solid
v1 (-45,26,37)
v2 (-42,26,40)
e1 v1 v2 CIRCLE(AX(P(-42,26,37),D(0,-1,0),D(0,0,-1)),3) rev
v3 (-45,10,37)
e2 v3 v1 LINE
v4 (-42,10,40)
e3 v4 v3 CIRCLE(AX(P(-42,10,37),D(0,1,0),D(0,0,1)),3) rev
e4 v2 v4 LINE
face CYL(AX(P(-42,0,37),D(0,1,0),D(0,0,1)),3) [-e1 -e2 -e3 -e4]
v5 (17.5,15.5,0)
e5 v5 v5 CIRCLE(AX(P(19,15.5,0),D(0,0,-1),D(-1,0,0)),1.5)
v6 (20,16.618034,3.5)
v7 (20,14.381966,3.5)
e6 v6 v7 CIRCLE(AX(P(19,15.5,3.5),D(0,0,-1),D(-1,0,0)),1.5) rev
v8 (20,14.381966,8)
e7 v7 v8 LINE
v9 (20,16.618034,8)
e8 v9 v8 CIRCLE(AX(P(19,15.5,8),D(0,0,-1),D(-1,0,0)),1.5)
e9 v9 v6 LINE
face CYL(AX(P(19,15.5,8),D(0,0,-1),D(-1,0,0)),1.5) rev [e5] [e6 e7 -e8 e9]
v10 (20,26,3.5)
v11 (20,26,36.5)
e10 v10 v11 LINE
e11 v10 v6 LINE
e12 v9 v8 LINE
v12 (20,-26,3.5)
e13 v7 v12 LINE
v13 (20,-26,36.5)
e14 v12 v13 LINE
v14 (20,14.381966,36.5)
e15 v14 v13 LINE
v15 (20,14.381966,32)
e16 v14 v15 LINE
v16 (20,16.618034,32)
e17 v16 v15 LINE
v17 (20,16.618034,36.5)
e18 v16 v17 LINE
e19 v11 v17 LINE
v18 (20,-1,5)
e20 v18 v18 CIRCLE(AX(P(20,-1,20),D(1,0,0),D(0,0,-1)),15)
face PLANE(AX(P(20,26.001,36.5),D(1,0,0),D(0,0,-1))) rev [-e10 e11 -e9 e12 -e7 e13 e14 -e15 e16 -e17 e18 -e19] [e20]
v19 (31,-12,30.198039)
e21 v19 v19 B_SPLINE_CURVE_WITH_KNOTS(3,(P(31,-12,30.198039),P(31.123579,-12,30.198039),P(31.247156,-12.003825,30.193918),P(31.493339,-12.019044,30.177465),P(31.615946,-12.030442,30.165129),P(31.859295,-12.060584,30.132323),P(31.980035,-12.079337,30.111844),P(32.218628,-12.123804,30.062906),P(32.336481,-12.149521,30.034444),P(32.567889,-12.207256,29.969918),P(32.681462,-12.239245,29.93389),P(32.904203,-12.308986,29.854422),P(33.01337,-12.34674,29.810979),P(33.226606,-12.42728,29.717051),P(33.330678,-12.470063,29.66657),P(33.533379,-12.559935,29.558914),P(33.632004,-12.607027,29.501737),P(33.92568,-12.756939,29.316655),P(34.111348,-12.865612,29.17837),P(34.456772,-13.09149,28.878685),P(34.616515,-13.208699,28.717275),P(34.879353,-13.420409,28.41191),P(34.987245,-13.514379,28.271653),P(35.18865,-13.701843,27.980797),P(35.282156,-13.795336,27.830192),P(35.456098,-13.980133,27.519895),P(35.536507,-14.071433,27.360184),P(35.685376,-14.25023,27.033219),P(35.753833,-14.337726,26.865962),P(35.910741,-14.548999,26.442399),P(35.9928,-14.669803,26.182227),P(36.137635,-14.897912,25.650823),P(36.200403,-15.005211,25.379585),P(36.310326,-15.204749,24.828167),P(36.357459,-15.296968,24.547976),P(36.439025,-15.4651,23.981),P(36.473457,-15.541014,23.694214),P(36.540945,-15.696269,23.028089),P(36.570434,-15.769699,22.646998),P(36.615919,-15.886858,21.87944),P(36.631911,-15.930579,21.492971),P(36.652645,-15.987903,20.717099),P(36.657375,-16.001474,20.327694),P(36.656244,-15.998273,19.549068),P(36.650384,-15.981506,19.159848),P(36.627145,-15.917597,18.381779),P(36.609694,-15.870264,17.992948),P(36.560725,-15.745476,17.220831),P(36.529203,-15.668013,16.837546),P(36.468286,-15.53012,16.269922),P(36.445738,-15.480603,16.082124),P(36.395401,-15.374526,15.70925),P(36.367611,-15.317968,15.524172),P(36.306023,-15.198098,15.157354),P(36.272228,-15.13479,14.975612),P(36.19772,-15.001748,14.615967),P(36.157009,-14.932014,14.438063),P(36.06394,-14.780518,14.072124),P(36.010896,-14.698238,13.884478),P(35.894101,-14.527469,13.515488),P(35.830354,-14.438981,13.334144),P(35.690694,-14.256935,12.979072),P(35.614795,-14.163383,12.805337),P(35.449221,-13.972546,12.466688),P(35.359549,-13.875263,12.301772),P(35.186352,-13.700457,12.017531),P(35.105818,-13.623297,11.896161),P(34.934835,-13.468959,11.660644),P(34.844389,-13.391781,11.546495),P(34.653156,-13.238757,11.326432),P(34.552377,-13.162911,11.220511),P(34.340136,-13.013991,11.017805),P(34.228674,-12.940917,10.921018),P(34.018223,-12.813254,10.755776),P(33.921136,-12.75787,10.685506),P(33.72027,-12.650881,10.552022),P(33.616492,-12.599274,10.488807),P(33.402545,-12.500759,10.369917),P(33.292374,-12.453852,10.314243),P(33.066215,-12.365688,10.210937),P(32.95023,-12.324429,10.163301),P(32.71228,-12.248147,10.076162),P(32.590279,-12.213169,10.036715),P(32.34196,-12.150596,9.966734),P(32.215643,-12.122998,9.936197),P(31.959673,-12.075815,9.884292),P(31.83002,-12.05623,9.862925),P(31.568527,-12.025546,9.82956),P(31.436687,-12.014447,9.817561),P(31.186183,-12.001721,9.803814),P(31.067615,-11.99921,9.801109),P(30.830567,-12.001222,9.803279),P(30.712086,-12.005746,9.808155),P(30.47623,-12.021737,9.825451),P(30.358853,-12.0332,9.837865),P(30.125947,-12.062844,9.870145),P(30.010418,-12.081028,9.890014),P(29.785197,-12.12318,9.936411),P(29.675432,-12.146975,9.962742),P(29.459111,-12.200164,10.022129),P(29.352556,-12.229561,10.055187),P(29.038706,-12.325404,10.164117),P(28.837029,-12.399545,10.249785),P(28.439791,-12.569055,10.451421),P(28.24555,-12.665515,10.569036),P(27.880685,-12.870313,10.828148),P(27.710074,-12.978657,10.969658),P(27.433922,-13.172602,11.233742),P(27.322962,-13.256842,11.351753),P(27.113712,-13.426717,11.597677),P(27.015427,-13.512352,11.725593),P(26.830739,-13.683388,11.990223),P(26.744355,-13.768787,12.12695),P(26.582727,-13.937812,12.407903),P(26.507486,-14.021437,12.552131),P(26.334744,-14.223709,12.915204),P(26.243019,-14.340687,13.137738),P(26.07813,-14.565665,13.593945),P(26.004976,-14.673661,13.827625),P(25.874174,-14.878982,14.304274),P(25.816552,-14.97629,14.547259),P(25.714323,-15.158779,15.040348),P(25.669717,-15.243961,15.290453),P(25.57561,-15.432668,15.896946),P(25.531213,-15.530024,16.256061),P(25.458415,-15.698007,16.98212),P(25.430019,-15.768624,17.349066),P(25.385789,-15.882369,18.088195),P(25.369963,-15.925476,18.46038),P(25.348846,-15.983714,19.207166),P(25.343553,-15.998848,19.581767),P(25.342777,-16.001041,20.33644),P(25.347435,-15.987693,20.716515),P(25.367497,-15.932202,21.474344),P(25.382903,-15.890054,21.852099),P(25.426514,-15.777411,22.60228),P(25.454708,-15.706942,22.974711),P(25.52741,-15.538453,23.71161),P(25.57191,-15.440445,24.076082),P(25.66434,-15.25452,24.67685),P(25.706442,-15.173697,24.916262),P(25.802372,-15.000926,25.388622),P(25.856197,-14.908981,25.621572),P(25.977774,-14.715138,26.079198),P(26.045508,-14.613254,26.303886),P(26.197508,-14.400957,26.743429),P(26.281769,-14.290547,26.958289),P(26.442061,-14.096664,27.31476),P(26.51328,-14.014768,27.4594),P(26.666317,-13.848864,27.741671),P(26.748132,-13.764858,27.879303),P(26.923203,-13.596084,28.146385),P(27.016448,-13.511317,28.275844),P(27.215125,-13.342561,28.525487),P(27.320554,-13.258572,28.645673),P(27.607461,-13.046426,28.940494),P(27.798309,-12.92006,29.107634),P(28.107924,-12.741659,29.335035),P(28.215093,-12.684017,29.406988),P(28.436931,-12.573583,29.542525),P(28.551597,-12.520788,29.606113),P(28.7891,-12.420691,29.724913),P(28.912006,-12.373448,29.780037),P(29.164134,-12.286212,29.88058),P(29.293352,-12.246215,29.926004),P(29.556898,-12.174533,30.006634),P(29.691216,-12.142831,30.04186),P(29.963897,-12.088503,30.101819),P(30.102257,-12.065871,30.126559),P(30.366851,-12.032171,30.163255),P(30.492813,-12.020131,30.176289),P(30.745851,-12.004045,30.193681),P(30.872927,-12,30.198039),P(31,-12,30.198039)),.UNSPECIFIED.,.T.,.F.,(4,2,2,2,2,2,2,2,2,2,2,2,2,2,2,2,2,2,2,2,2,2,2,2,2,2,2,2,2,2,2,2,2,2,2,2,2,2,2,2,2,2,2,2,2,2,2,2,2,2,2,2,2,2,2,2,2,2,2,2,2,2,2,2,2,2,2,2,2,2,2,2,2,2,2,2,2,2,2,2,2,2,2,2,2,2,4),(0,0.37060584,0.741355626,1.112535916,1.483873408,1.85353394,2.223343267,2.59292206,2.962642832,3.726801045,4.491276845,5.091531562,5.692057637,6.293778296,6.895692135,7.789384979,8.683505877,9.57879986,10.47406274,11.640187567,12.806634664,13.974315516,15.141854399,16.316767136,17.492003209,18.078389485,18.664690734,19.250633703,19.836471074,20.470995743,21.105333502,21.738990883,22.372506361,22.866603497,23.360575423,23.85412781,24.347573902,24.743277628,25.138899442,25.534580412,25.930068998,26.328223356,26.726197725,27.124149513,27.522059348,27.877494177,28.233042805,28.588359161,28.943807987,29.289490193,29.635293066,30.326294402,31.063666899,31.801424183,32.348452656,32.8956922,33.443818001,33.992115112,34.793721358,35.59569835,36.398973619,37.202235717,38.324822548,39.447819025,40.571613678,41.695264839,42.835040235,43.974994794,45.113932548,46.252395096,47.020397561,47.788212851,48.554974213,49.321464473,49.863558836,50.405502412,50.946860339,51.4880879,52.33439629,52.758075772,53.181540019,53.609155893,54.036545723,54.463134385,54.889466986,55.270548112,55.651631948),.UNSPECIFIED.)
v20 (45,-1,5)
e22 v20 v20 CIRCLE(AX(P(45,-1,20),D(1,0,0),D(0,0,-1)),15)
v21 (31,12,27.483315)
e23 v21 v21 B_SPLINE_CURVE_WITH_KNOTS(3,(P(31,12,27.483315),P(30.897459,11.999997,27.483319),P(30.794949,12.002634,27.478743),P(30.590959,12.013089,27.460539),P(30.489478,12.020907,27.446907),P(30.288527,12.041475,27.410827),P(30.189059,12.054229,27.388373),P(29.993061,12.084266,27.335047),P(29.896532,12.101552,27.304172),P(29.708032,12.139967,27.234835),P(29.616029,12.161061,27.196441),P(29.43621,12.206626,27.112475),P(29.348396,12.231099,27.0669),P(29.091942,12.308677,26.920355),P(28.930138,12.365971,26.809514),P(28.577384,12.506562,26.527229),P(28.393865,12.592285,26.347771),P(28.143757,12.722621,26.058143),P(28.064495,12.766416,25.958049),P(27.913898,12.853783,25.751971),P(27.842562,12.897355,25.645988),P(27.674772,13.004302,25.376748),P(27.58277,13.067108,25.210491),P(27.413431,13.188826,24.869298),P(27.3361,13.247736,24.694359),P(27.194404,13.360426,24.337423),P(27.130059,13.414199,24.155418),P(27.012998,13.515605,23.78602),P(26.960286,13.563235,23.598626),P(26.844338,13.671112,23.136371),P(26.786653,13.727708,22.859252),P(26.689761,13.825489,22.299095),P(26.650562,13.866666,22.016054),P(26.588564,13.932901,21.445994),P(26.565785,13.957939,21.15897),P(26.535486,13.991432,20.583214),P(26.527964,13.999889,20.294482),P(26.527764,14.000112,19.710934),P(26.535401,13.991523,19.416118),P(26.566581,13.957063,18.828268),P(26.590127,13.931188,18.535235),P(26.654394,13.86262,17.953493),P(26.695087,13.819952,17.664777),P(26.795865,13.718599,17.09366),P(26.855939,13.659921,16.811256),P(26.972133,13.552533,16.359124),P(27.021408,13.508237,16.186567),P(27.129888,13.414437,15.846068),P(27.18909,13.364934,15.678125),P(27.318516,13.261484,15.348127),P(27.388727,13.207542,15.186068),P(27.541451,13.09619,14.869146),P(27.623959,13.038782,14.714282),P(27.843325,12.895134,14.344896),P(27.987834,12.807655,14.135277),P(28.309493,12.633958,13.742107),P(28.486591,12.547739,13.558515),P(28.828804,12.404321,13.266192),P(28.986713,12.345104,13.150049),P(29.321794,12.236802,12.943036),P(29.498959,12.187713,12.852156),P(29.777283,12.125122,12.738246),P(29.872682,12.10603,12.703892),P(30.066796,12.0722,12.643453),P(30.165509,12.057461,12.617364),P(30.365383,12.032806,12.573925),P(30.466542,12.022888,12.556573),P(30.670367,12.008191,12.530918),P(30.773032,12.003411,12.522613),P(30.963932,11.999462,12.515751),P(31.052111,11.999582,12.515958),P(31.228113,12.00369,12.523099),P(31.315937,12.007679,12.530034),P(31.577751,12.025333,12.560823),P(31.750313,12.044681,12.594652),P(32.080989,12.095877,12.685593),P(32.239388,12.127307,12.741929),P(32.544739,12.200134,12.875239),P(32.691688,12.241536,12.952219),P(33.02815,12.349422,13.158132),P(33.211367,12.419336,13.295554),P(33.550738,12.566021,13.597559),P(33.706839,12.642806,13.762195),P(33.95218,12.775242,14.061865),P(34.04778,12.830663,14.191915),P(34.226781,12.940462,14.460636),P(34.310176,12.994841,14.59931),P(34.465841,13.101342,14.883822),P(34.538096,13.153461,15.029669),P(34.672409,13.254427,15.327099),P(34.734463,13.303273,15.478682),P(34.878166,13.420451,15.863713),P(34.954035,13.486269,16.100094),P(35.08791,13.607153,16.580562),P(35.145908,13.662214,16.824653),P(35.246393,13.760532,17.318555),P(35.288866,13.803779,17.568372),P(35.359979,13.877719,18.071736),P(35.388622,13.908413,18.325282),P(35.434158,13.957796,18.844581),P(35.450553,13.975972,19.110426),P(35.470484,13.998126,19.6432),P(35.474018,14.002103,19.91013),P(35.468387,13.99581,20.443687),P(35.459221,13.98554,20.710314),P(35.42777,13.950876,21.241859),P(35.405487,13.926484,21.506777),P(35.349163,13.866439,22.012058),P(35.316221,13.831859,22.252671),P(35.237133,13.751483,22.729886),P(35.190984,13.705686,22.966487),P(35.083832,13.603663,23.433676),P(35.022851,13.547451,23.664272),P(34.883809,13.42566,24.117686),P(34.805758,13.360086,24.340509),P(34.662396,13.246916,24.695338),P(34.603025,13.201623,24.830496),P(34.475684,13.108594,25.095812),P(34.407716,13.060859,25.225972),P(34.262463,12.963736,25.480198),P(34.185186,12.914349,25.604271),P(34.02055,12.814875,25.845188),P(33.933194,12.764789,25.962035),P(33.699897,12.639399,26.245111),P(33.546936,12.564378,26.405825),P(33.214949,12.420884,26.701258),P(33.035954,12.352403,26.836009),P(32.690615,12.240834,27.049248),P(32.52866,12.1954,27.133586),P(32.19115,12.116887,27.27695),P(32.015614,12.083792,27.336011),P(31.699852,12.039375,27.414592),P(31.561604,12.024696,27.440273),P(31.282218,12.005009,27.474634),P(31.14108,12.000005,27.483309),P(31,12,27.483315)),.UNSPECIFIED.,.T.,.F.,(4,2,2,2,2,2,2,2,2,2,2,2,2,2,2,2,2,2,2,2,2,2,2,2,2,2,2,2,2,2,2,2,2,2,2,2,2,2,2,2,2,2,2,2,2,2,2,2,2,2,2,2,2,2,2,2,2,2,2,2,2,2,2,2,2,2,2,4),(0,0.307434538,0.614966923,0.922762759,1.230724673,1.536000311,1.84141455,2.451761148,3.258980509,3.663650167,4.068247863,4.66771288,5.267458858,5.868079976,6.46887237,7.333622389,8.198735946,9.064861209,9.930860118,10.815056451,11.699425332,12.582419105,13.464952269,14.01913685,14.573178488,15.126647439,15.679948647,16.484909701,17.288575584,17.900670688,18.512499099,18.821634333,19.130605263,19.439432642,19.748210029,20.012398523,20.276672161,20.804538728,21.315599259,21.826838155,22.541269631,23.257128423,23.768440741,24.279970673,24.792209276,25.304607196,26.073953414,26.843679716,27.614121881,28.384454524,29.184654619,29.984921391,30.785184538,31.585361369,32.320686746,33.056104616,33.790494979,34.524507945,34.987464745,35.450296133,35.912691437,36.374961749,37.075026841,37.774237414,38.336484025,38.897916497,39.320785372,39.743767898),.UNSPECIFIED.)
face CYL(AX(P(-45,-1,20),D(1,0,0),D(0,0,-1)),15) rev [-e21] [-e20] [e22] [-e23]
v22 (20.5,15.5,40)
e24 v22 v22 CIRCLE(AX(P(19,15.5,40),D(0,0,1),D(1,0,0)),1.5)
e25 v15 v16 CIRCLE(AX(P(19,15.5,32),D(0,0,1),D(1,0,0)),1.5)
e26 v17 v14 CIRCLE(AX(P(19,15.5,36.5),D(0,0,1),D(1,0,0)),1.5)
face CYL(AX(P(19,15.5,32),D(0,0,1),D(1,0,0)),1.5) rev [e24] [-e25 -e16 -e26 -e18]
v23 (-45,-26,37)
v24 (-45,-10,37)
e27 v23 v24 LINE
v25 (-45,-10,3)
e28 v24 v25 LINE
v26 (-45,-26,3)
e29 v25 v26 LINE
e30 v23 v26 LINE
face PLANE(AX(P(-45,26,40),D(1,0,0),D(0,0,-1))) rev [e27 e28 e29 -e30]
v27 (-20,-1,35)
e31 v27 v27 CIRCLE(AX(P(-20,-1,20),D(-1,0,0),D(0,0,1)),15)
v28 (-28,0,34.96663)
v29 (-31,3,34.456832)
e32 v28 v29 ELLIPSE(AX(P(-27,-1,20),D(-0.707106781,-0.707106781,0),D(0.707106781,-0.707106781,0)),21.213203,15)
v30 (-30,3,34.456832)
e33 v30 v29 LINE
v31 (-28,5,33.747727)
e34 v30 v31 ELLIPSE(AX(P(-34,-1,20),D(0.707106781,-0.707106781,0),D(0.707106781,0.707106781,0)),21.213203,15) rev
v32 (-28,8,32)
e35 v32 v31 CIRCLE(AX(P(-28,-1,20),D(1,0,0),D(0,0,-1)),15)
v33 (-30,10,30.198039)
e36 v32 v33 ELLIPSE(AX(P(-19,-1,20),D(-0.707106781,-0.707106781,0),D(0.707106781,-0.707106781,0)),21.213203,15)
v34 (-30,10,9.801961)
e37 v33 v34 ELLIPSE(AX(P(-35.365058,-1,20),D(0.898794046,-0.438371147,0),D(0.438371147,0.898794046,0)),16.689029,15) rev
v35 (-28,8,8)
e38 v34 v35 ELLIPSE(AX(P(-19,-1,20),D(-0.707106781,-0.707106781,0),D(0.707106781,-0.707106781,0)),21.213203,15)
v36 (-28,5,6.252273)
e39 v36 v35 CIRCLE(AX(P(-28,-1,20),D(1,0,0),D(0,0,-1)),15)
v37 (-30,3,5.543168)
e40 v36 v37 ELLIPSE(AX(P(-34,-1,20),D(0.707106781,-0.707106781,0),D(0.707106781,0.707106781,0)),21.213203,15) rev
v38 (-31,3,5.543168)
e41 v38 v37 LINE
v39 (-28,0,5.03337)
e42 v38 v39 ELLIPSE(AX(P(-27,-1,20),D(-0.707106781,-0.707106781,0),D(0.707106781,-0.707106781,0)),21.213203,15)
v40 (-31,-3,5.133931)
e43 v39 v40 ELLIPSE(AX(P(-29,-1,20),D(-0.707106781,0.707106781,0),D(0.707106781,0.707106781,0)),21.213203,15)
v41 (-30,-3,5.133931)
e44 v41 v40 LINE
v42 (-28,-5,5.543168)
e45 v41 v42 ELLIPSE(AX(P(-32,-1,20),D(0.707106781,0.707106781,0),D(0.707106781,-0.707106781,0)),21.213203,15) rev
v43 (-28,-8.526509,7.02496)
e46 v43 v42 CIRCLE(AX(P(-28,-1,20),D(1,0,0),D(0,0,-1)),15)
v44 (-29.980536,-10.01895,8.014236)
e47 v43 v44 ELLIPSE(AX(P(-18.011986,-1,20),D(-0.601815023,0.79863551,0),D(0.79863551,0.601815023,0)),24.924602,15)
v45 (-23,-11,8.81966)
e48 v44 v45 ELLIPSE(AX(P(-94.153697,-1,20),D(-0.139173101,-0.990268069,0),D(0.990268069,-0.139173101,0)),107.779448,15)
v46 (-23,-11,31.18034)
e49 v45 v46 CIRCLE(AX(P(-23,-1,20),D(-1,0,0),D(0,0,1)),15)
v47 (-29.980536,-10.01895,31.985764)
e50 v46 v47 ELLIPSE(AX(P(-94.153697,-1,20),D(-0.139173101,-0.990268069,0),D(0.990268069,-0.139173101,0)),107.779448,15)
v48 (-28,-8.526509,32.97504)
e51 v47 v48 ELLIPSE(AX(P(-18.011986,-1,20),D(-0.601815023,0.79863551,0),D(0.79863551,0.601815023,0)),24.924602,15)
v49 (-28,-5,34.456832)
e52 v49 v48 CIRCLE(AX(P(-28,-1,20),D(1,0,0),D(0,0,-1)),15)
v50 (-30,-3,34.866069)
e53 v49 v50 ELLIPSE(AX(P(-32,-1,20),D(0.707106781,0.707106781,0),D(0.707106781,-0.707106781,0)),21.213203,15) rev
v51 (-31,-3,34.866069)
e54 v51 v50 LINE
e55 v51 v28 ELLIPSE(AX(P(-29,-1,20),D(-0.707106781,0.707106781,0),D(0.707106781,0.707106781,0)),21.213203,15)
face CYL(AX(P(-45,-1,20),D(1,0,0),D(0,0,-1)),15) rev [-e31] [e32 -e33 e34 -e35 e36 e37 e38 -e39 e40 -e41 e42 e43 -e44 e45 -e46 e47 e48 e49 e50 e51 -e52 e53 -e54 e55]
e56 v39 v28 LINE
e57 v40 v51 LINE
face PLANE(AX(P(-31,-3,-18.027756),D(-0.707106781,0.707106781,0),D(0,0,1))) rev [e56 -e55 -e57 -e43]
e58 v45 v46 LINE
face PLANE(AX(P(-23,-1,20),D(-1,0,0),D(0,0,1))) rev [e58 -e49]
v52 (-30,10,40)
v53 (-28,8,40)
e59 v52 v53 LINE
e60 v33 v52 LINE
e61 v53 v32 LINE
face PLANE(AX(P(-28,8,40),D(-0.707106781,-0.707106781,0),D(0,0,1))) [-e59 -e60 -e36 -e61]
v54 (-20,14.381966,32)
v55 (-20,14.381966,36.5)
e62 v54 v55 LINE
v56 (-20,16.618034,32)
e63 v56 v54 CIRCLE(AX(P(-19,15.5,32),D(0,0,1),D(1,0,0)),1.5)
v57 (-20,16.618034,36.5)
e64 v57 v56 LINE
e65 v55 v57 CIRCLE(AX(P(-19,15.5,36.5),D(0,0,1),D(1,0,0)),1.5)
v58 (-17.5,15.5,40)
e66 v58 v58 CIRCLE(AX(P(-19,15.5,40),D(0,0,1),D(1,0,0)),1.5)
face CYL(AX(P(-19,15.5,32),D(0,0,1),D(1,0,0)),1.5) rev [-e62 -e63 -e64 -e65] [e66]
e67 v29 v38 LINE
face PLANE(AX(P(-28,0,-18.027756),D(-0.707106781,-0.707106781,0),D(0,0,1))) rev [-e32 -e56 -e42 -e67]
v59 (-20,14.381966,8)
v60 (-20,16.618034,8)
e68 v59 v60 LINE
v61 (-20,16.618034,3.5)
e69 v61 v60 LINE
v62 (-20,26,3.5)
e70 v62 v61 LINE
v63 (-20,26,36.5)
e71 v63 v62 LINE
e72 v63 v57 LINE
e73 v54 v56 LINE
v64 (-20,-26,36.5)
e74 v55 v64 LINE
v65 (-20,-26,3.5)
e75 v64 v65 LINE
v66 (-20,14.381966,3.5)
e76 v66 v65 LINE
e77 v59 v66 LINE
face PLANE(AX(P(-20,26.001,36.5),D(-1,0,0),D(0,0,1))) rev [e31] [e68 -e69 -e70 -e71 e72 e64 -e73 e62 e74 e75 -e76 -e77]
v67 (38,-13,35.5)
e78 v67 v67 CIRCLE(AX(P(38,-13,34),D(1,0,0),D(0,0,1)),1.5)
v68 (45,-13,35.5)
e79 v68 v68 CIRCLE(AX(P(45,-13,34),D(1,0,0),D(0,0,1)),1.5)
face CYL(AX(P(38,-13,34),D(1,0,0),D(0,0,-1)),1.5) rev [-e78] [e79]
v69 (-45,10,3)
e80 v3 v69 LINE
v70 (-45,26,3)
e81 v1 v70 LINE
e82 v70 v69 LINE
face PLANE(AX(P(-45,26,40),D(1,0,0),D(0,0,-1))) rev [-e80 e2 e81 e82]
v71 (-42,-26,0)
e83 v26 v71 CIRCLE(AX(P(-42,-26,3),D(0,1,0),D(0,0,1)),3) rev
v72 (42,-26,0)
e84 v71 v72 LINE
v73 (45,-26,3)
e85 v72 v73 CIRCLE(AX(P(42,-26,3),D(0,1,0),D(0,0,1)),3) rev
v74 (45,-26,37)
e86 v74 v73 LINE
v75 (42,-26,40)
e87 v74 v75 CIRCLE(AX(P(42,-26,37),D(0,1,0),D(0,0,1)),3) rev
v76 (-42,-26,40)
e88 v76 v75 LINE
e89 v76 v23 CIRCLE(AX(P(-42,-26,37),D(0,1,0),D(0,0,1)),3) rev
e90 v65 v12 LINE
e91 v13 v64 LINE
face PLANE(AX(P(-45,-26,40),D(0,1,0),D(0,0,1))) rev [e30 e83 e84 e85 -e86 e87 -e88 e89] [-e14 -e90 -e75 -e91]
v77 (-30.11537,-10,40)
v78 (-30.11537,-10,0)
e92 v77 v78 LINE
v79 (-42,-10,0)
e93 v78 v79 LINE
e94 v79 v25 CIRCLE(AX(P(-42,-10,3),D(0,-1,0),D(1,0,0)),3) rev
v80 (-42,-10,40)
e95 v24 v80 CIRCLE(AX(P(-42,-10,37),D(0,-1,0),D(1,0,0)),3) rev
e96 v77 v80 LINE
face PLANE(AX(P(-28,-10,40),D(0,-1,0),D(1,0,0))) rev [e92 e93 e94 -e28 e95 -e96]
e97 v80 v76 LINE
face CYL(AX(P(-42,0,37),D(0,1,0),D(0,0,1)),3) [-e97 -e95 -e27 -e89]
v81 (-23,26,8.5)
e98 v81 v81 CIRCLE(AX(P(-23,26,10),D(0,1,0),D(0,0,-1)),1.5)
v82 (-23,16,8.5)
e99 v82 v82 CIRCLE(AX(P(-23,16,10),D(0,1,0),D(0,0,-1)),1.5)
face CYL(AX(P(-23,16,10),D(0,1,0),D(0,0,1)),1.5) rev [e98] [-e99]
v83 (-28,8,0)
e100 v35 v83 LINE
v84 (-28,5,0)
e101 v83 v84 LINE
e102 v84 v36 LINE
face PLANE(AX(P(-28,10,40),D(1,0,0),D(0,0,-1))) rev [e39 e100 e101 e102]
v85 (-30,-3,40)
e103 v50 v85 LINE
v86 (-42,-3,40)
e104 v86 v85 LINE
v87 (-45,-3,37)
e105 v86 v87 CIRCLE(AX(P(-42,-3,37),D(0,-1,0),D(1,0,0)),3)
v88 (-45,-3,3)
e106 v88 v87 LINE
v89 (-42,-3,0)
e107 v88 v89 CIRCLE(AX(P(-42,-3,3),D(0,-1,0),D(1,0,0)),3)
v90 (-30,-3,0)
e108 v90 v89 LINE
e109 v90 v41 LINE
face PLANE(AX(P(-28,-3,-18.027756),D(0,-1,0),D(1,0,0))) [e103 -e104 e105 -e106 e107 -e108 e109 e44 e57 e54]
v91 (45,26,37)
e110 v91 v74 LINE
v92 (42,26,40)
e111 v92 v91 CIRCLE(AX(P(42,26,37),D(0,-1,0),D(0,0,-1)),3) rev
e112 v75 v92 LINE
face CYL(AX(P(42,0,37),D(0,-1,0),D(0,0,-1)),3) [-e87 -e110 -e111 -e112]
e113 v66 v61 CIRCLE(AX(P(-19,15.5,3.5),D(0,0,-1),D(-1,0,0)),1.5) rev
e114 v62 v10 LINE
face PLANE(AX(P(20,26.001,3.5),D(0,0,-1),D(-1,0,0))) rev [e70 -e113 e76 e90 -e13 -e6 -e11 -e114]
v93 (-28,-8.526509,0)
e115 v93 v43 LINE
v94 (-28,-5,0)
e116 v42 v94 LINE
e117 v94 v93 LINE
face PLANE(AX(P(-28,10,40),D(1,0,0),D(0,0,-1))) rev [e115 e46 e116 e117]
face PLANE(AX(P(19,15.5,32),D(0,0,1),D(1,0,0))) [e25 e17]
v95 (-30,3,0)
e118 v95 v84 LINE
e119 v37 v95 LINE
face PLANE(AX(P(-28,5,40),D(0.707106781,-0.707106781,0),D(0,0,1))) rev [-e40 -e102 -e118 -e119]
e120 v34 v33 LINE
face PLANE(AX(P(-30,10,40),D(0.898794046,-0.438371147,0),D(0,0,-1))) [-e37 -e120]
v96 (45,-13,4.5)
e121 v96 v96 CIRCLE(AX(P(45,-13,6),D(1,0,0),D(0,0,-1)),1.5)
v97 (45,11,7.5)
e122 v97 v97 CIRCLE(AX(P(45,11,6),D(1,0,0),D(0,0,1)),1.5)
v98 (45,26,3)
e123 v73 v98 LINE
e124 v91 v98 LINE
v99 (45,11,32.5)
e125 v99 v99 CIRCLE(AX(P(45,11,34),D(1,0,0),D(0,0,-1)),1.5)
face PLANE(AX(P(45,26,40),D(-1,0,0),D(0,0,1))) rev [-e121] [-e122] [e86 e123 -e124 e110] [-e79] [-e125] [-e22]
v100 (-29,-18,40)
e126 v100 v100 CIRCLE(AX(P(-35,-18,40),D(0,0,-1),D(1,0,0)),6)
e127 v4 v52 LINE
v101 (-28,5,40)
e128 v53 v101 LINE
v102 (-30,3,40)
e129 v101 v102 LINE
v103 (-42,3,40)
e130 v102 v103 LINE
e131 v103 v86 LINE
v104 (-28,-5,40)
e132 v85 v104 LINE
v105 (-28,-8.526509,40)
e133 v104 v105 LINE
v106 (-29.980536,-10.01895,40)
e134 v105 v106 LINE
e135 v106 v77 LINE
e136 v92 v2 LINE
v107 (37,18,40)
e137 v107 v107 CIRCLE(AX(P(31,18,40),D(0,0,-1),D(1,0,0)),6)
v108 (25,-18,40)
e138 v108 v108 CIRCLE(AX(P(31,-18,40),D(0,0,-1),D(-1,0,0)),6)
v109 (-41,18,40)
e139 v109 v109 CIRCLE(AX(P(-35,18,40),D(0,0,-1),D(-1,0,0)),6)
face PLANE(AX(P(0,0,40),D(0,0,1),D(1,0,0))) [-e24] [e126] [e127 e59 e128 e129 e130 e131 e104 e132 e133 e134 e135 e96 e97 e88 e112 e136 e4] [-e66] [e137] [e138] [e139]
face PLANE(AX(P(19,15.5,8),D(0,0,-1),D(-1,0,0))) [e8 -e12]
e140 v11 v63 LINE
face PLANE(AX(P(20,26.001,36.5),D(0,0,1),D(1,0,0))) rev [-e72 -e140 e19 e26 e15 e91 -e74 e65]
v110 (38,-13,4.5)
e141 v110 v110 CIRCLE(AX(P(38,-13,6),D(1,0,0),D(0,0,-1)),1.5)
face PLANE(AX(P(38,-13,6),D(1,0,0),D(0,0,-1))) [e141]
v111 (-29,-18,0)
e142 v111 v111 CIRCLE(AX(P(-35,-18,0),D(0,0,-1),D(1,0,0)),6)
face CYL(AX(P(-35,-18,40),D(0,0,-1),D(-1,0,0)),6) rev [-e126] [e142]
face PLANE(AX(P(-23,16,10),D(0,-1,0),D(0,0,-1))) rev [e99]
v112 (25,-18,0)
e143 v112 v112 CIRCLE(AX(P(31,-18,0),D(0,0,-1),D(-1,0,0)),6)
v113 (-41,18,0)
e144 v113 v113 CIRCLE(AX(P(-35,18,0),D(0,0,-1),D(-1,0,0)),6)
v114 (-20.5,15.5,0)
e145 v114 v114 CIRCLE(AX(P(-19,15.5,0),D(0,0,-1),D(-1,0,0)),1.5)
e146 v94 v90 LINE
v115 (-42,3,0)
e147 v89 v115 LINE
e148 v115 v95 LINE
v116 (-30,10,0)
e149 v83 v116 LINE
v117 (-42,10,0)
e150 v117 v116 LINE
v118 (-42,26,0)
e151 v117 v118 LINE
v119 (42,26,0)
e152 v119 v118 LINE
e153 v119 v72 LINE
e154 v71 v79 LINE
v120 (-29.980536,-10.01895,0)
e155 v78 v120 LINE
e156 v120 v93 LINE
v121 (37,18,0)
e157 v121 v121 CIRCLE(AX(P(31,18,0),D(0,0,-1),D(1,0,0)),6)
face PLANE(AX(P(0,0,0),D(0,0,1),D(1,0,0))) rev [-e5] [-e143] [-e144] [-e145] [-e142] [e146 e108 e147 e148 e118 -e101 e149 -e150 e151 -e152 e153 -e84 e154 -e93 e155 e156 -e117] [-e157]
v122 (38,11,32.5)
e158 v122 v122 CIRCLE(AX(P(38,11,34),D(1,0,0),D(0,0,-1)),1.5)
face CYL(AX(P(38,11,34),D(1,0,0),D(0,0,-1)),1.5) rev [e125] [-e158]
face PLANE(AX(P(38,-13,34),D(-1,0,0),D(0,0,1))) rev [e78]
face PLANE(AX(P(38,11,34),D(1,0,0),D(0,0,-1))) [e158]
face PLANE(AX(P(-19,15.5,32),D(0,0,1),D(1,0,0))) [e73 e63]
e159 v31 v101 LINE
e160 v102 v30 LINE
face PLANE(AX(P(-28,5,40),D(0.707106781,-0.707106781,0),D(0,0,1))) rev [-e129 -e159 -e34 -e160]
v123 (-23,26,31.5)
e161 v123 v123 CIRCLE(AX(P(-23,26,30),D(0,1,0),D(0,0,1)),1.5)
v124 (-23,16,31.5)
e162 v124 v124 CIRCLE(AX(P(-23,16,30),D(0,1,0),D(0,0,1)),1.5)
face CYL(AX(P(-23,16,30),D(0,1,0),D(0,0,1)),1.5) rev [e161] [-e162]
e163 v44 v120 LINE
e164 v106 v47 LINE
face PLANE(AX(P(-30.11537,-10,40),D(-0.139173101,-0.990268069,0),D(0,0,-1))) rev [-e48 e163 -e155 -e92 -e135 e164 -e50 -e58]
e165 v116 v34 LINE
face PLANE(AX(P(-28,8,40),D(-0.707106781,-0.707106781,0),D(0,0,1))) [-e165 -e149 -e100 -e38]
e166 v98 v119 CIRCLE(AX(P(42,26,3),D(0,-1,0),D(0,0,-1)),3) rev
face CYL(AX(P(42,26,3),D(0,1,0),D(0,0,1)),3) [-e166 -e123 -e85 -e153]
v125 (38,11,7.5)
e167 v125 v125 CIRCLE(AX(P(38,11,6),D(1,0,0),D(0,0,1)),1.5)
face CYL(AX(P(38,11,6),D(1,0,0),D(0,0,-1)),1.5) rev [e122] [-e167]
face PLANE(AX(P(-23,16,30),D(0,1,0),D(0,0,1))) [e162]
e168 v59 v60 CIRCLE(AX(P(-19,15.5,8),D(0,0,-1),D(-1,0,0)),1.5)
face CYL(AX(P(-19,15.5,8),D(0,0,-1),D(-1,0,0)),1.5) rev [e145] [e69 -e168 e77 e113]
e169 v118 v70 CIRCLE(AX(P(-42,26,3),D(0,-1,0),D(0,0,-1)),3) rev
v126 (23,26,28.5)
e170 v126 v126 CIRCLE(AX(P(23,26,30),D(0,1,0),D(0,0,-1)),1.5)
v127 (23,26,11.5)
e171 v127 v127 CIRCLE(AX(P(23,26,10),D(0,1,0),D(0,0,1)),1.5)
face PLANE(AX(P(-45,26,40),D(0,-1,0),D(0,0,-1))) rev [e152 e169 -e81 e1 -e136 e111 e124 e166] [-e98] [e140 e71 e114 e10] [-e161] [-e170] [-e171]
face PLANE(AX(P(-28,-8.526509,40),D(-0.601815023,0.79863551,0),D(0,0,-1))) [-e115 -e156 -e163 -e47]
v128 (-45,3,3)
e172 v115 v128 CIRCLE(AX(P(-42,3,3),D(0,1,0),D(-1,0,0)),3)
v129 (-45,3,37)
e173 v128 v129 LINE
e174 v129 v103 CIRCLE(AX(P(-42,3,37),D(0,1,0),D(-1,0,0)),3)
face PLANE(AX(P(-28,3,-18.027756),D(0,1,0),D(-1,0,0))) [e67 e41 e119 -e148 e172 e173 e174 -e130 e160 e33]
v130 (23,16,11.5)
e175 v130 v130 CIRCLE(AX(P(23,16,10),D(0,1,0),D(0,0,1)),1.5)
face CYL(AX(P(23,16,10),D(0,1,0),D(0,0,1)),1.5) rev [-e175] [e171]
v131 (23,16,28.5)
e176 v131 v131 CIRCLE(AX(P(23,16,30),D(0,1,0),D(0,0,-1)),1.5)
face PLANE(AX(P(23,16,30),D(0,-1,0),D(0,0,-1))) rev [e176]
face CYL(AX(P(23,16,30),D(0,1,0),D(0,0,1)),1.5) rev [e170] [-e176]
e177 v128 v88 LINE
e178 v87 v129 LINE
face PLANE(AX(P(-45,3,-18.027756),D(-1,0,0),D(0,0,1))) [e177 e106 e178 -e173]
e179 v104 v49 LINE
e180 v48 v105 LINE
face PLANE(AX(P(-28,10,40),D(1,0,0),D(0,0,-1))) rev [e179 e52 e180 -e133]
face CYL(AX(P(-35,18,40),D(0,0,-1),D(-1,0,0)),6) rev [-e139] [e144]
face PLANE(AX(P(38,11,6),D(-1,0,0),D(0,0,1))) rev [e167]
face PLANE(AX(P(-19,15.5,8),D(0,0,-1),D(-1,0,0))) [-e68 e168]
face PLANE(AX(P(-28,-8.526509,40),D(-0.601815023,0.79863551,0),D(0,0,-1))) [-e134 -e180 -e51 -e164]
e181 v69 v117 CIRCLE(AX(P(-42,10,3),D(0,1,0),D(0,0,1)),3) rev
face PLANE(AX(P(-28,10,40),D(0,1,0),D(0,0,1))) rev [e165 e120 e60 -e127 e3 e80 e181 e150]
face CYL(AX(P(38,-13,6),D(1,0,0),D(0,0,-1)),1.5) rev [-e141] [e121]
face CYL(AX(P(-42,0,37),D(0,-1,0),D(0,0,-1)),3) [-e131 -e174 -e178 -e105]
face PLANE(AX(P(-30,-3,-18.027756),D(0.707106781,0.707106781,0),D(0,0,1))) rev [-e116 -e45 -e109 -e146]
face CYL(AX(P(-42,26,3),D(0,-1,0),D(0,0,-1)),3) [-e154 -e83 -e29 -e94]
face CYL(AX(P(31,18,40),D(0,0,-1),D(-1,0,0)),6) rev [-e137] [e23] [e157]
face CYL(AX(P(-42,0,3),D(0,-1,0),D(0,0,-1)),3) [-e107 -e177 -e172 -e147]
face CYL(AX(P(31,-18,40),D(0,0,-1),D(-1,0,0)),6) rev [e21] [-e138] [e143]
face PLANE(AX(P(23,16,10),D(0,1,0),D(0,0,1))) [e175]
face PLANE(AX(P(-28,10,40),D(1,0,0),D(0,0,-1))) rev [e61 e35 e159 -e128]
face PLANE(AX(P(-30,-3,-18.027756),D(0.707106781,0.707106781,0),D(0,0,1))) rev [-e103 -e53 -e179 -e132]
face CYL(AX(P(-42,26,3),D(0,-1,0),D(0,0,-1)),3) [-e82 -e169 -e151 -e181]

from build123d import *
from OCP.BRepFilletAPI import BRepFilletAPI_MakeChamfer

# Parameters (mm, degrees)
SKETCH_1_W           = 90
SKETCH_1_H           = 52
EXTRUDE_1_DEPTH      = 40
SKETCH_2_R           = 6
CUT_EXTRUDE_1_DEPTH  = 66.582009728
SKETCH_6_R           = 1.5
CUT_EXTRUDE_4_DEPTH  = 8
SKETCH_8_W           = 17
SKETCH_8_H           = 20
CUT_EXTRUDE_5_DEPTH  = 66.582009728
SKETCH_9_R           = 15
CUT_EXTRUDE_6_DEPTH  = 102.862652626
SKETCH_10_R          = 1.5
CUT_EXTRUDE_7_DEPTH  = 7
EXTRUDE_START        = -22
EXTRUDE_4_DEPTH      = 22
SKETCH_14_R          = 6
CUT_EXTRUDE_8_DEPTH  = 66.582009858
CUT_EXTRUDE_9_REACH  = 81.555
SKETCH_17_W          = 40
SKETCH_17_H          = 33
CHAMFER_9_SIZE       = 1
CHAMFER_9_SIZE2      = 7.115369722
EXTRUDE_START_2      = -17
EXTRUDE_6_DEPTH      = 17
CHAMFER_10_SIZE      = 4.100607683
CHAMFER_10_SIZE_2    = 2
SKETCH_20_R          = 6
CUT_EXTRUDE_13_DEPTH = 66.582009858
EXTRUDE_7_REACH      = 67.582
SKETCH_21_W          = 17
SKETCH_21_H          = 6
FILLET_3_R           = 3
CHAMFER_12_SIZE      = 3
CUT_EXTRUDE_START    = -8
SKETCH_24_R          = 1.5
CUT_EXTRUDE_16_DEPTH = 8
SKETCH_25_R          = 1.5
CUT_EXTRUDE_17_DEPTH = 10
CHAMFER_13_SIZE      = 2
CHAMFER_13_SIZE2     = 1.77078723


with BuildPart() as part:
    # 草圖1 → 填料-伸長1 (new body)
    with BuildSketch(Plane.XY):
        Rectangle(SKETCH_1_W, SKETCH_1_H)
    extrude(amount=EXTRUDE_1_DEPTH)

    # 草圖2 → 除料-伸長1 (cut, through all)
    with BuildSketch(Plane(origin=(0, 0, 0), x_dir=(-1, 0, 0), z_dir=(0, 0, -1))):
        with Locations((-31, -18)):
            Circle(SKETCH_2_R)
        with Locations(Location((35, -18, 0), (0, 0, 180))):
            Circle(SKETCH_2_R)
        with Locations((35, 18)):
            Circle(SKETCH_2_R)
        with Locations(Location((-31, 18, 0), (0, 0, 180))):
            Circle(SKETCH_2_R)
    extrude(amount=-CUT_EXTRUDE_1_DEPTH, mode=Mode.SUBTRACT)

    # 草圖6 → 除料-伸長4 (cut)
    with BuildSketch(Plane(origin=(0, 0, 0), x_dir=(-1, 0, 0), z_dir=(0, 0, -1))):
        with Locations((-19, 15.5)):
            Circle(SKETCH_6_R)
        with Locations((19, 15.5)):
            Circle(SKETCH_6_R)
    extrude(amount=-CUT_EXTRUDE_4_DEPTH, mode=Mode.SUBTRACT)

    # 草圖8 → 除料-伸長5 (cut, through all)
    with BuildSketch(Plane(origin=(0, 0, 0), x_dir=(-1, 0, 0), z_dir=(0, 0, -1))):
        with Locations((36.5, 0)):
            Rectangle(SKETCH_8_W, SKETCH_8_H)
    extrude(amount=-CUT_EXTRUDE_5_DEPTH, mode=Mode.SUBTRACT)

    # 草圖9 → 除料-伸長6 (cut, through all)
    with BuildSketch(Plane(origin=(45, 0, 0), x_dir=(0, 0, -1), z_dir=(1, 0, 0))):
        with Locations((-20, -1)):
            Circle(SKETCH_9_R)
    extrude(amount=-CUT_EXTRUDE_6_DEPTH, mode=Mode.SUBTRACT)

    # 草圖10 → 除料-伸長7 (cut)
    with BuildSketch(Plane(origin=(45, 0, 0), x_dir=(0, 0, -1), z_dir=(1, 0, 0))):
        with Locations((-34, 11)):
            Circle(SKETCH_10_R)
        with Locations(Location((-6, 11, 0), (0, 0, 180))):
            Circle(SKETCH_10_R)
        with Locations((-6, -13)):
            Circle(SKETCH_10_R)
        with Locations(Location((-34, -13, 0), (0, 0, 180))):
            Circle(SKETCH_10_R)
    extrude(amount=-CUT_EXTRUDE_7_DEPTH, mode=Mode.SUBTRACT)

    # 草圖11 → 填料-伸長4 (add)
    with BuildSketch(Plane.ZY.offset(45).offset(EXTRUDE_START)):
        with BuildLine():
            Line((8, -10), (32, -10))
            ThreePointArc((32, -10), (20, -16), (8, -10))
        make_face()
    extrude(amount=EXTRUDE_4_DEPTH)

    # 草圖14 → 除料-伸長8 (cut, through all)
    with BuildSketch(Plane(origin=(0, 0, 0), x_dir=(-1, 0, 0), z_dir=(0, 0, -1))):
        with Locations((-31, -18)):
            Circle(SKETCH_14_R)
        with Locations(Location((35, -18, 0), (0, 0, 180))):
            Circle(SKETCH_14_R)
    extrude(amount=-CUT_EXTRUDE_8_DEPTH, mode=Mode.SUBTRACT)

    # 草圖17 → 除料-伸長9 (cut, up to next)
    with BuildSketch(Plane.XZ.offset(26), mode=Mode.PRIVATE) as cut_extrude_9_sk1:
        with Locations((0, 20)):
            Rectangle(SKETCH_17_W, SKETCH_17_H)
    cut_extrude_9_tool1 = extrude(cut_extrude_9_sk1.sketch, amount=-CUT_EXTRUDE_9_REACH, mode=Mode.PRIVATE) & part.part
    add(cut_extrude_9_tool1.solids().sort_by_distance((0, -26, 20))[0], mode=Mode.SUBTRACT)

    # 導角9
    chamfer_9_edges = [part.edges().sort_by_distance(p)[0] for p in [
        (-23, -10, 20),
    ]]
    chamfer_9_side = [part.faces().sort_by_distance(p)[0] for p in [
        (-23, -12.44657889, 20),
    ]]
    chamfer(chamfer_9_edges, length=CHAMFER_9_SIZE, length2=CHAMFER_9_SIZE2, reference=chamfer_9_side[0])

    # 草圖19 → 填料-伸長6 (add)
    with BuildSketch(Plane.ZY.offset(45).offset(EXTRUDE_START_2)):
        with BuildLine():
            Line((9.801960973, 10), (30.198039027, 10))
            ThreePointArc((30.198039027, 10), (20, 14), (9.801960973, 10))
        make_face()
    extrude(amount=EXTRUDE_6_DEPTH)

    # 導角10
    # the kernel refuses this chamfer: 4.100607683, 2 mm, written as the material it takes off along each edge
    with BuildSketch(Plane(origin=(-28, 10, -0.81963963), x_dir=(0.016923890849829204, 0.9998567807033681, 0), z_dir=(0, 0, 1))) as chamfer_10_piece_1_section:
        Polygon((CHAMFER_10_SIZE * 0.999856780742, CHAMFER_10_SIZE * 0.0169238908505), (-CHAMFER_10_SIZE_2 * 0.0169238908498, CHAMFER_10_SIZE_2 * 0.999856780703), (0, 0), align=None)
    chamfer_10_piece_1 = extrude(amount=41.639279261, mode=Mode.PRIVATE)
    chamfer_10_piece_1 = chamfer_10_piece_1 & Plane(origin=(-28.71346755, -1, 20), x_dir=(0, 0, -1), z_dir=(1, 0, 0)) * Cylinder(15, 100, mode=Mode.PRIVATE)
    add(chamfer_10_piece_1, mode=Mode.SUBTRACT)

    # 草圖20 → 除料-伸長13 (cut, through all)
    with BuildSketch(Plane(origin=(0, 0, 0), x_dir=(-1, 0, 0), z_dir=(0, 0, -1))):
        with Locations((35, 18)):
            Circle(SKETCH_20_R)
    extrude(amount=-CUT_EXTRUDE_13_DEPTH, mode=Mode.SUBTRACT)

    # 填料-伸長7: up to this face of the body (flat: up to its plane)
    extrude_7_end = Plane(part.part.faces().sort_by_distance((3.440035567, -0.055755643, 0))[0])
    # 草圖21 → 填料-伸長7 (add, up to the picked face)
    with BuildSketch(Plane.XY.offset(40), mode=Mode.PRIVATE) as extrude_7_sk1:
        with Locations((-36.5, 0)):
            Rectangle(SKETCH_21_W, SKETCH_21_H)
    extrude_7_tool1 = split(extrude(extrude_7_sk1.sketch, amount=-EXTRUDE_7_REACH, mode=Mode.PRIVATE), bisect_by=extrude_7_end, keep=Keep.BOTH, mode=Mode.PRIVATE)
    add(extrude_7_tool1.solids().sort_by(Axis((-36.5, 0, 40), (0, 0, -1)))[0])

    # 圓角3
    fillet_3_edges = [part.edges().sort_by_distance(p)[0] for p in [
        (45, 0, 40),
        (-45, 0, 40),
        (-45, 0, 0),
        (-45, 18, 40),
        (-45, -18, 0),
        (-45, -18, 40),
        (45, 0, 0),
        (-45, 18, 0),
    ]]
    fillet(fillet_3_edges, radius=FILLET_3_R)

    # 導角12
    # the kernel refuses this chamfer: 3 mm, written as the material it takes off along each edge
    with BuildSketch(Plane(origin=(-28, -3, 42.581117711), x_dir=(-0.9996219169112968, -0.02749587661058648, 0), z_dir=(0, 0, -1))) as chamfer_12_piece_1_section:
        Polygon((CHAMFER_12_SIZE * 0.999621916911, CHAMFER_12_SIZE * 0.0274958766106), (-CHAMFER_12_SIZE * 0.0274958766106, CHAMFER_12_SIZE * 0.999621916911), (0, 0), align=None)
    chamfer_12_piece_1 = extrude(amount=45.162235422, mode=Mode.PRIVATE)
    chamfer_12_piece_1 = chamfer_12_piece_1 & Plane(origin=(-28.99910485, -1, 20), x_dir=(0, 0, -1), z_dir=(1, 0, 0)) * Cylinder(15, 103, mode=Mode.PRIVATE)
    add(chamfer_12_piece_1, mode=Mode.SUBTRACT)
    with BuildSketch(Plane(origin=(-28, 3, 42.171881259), x_dir=(-0.9996219169112968, 0.02749587661058619, 0), z_dir=(0, 0, -1))) as chamfer_12_piece_2_section:
        Polygon((CHAMFER_12_SIZE * 0.999621916911, -CHAMFER_12_SIZE * 0.0274958766106), (-CHAMFER_12_SIZE * 0.0274958766106, -CHAMFER_12_SIZE * 0.999621916911), (0, 0), align=None)
    chamfer_12_piece_2 = extrude(amount=44.343762517, mode=Mode.PRIVATE)
    chamfer_12_piece_2 = chamfer_12_piece_2 & Plane(origin=(-28.996755862, -1, 20), x_dir=(0, 0, -1), z_dir=(1, 0, 0)) * Cylinder(15, 101, mode=Mode.PRIVATE)
    add(chamfer_12_piece_2, mode=Mode.SUBTRACT)

    # 草圖24 → 除料-伸長16 (cut)
    with BuildSketch(Plane.XY.offset(40).offset(CUT_EXTRUDE_START)):
        with Locations(Location((-19, 15.5, 0), (0, 0, 180))):
            Circle(SKETCH_24_R)
        with Locations(Location((19, 15.5, 0), (0, 0, 180))):
            Circle(SKETCH_24_R)
    extrude(amount=CUT_EXTRUDE_16_DEPTH, mode=Mode.SUBTRACT)

    # 草圖25 → 除料-伸長17 (cut)
    with BuildSketch(Plane(origin=(0, 26, 0), x_dir=(1, 0, 0), z_dir=(0, 1, 0))):
        with Locations(Location((23, -10, 0), (0, 0, 270))):
            Circle(SKETCH_25_R)
        with Locations(Location((23, -30, 0), (0, 0, 90))):
            Circle(SKETCH_25_R)
        with Locations(Location((-23, -30, 0), (0, 0, 270))):
            Circle(SKETCH_25_R)
        with Locations(Location((-23, -10, 0), (0, 0, 90))):
            Circle(SKETCH_25_R)
    extrude(amount=-CUT_EXTRUDE_17_DEPTH, mode=Mode.SUBTRACT)

    # 導角13: one chamfer whose edges measure the first distance from different faces: ONE call of the kernel's chamfer builder (chamfer() names one face for all edges)
    chamfer_13_edges_1 = [part.edges().sort_by_distance(p)[0] for p in [
        (-28, -10.297295826, 4.114418246),
        (-28, -10.297295826, 35.885581754),
    ]]
    chamfer_13_side_1 = [part.faces().sort_by_distance(p)[0] for p in [
        (-27.02177909, -10.43477581, 20),
    ]]
    chamfer_13_edges_2 = [part.edges().sort_by_distance(p)[0] for p in [
        (-28, -3, 37.433034374),
        (-28, -3, 2.566965626),
        (-28, 10, 4.900980486),
        (-28, 10, 35.099019514),
        (-28, 3, 37.228416147),
        (-28, 3, 2.771583853),
    ]]
    chamfer_13 = BRepFilletAPI_MakeChamfer(part.part.solid().wrapped)
    for e in chamfer_13_edges_1:
        chamfer_13.Add(CHAMFER_13_SIZE, CHAMFER_13_SIZE2, e.wrapped, chamfer_13_side_1[0].wrapped)  # the first distance lies on this face
    for e in chamfer_13_edges_2:
        chamfer_13.Add(CHAMFER_13_SIZE, e.wrapped)
    add(Compound.cast(chamfer_13.Shape()), mode=Mode.REPLACE)


solid = part.part
